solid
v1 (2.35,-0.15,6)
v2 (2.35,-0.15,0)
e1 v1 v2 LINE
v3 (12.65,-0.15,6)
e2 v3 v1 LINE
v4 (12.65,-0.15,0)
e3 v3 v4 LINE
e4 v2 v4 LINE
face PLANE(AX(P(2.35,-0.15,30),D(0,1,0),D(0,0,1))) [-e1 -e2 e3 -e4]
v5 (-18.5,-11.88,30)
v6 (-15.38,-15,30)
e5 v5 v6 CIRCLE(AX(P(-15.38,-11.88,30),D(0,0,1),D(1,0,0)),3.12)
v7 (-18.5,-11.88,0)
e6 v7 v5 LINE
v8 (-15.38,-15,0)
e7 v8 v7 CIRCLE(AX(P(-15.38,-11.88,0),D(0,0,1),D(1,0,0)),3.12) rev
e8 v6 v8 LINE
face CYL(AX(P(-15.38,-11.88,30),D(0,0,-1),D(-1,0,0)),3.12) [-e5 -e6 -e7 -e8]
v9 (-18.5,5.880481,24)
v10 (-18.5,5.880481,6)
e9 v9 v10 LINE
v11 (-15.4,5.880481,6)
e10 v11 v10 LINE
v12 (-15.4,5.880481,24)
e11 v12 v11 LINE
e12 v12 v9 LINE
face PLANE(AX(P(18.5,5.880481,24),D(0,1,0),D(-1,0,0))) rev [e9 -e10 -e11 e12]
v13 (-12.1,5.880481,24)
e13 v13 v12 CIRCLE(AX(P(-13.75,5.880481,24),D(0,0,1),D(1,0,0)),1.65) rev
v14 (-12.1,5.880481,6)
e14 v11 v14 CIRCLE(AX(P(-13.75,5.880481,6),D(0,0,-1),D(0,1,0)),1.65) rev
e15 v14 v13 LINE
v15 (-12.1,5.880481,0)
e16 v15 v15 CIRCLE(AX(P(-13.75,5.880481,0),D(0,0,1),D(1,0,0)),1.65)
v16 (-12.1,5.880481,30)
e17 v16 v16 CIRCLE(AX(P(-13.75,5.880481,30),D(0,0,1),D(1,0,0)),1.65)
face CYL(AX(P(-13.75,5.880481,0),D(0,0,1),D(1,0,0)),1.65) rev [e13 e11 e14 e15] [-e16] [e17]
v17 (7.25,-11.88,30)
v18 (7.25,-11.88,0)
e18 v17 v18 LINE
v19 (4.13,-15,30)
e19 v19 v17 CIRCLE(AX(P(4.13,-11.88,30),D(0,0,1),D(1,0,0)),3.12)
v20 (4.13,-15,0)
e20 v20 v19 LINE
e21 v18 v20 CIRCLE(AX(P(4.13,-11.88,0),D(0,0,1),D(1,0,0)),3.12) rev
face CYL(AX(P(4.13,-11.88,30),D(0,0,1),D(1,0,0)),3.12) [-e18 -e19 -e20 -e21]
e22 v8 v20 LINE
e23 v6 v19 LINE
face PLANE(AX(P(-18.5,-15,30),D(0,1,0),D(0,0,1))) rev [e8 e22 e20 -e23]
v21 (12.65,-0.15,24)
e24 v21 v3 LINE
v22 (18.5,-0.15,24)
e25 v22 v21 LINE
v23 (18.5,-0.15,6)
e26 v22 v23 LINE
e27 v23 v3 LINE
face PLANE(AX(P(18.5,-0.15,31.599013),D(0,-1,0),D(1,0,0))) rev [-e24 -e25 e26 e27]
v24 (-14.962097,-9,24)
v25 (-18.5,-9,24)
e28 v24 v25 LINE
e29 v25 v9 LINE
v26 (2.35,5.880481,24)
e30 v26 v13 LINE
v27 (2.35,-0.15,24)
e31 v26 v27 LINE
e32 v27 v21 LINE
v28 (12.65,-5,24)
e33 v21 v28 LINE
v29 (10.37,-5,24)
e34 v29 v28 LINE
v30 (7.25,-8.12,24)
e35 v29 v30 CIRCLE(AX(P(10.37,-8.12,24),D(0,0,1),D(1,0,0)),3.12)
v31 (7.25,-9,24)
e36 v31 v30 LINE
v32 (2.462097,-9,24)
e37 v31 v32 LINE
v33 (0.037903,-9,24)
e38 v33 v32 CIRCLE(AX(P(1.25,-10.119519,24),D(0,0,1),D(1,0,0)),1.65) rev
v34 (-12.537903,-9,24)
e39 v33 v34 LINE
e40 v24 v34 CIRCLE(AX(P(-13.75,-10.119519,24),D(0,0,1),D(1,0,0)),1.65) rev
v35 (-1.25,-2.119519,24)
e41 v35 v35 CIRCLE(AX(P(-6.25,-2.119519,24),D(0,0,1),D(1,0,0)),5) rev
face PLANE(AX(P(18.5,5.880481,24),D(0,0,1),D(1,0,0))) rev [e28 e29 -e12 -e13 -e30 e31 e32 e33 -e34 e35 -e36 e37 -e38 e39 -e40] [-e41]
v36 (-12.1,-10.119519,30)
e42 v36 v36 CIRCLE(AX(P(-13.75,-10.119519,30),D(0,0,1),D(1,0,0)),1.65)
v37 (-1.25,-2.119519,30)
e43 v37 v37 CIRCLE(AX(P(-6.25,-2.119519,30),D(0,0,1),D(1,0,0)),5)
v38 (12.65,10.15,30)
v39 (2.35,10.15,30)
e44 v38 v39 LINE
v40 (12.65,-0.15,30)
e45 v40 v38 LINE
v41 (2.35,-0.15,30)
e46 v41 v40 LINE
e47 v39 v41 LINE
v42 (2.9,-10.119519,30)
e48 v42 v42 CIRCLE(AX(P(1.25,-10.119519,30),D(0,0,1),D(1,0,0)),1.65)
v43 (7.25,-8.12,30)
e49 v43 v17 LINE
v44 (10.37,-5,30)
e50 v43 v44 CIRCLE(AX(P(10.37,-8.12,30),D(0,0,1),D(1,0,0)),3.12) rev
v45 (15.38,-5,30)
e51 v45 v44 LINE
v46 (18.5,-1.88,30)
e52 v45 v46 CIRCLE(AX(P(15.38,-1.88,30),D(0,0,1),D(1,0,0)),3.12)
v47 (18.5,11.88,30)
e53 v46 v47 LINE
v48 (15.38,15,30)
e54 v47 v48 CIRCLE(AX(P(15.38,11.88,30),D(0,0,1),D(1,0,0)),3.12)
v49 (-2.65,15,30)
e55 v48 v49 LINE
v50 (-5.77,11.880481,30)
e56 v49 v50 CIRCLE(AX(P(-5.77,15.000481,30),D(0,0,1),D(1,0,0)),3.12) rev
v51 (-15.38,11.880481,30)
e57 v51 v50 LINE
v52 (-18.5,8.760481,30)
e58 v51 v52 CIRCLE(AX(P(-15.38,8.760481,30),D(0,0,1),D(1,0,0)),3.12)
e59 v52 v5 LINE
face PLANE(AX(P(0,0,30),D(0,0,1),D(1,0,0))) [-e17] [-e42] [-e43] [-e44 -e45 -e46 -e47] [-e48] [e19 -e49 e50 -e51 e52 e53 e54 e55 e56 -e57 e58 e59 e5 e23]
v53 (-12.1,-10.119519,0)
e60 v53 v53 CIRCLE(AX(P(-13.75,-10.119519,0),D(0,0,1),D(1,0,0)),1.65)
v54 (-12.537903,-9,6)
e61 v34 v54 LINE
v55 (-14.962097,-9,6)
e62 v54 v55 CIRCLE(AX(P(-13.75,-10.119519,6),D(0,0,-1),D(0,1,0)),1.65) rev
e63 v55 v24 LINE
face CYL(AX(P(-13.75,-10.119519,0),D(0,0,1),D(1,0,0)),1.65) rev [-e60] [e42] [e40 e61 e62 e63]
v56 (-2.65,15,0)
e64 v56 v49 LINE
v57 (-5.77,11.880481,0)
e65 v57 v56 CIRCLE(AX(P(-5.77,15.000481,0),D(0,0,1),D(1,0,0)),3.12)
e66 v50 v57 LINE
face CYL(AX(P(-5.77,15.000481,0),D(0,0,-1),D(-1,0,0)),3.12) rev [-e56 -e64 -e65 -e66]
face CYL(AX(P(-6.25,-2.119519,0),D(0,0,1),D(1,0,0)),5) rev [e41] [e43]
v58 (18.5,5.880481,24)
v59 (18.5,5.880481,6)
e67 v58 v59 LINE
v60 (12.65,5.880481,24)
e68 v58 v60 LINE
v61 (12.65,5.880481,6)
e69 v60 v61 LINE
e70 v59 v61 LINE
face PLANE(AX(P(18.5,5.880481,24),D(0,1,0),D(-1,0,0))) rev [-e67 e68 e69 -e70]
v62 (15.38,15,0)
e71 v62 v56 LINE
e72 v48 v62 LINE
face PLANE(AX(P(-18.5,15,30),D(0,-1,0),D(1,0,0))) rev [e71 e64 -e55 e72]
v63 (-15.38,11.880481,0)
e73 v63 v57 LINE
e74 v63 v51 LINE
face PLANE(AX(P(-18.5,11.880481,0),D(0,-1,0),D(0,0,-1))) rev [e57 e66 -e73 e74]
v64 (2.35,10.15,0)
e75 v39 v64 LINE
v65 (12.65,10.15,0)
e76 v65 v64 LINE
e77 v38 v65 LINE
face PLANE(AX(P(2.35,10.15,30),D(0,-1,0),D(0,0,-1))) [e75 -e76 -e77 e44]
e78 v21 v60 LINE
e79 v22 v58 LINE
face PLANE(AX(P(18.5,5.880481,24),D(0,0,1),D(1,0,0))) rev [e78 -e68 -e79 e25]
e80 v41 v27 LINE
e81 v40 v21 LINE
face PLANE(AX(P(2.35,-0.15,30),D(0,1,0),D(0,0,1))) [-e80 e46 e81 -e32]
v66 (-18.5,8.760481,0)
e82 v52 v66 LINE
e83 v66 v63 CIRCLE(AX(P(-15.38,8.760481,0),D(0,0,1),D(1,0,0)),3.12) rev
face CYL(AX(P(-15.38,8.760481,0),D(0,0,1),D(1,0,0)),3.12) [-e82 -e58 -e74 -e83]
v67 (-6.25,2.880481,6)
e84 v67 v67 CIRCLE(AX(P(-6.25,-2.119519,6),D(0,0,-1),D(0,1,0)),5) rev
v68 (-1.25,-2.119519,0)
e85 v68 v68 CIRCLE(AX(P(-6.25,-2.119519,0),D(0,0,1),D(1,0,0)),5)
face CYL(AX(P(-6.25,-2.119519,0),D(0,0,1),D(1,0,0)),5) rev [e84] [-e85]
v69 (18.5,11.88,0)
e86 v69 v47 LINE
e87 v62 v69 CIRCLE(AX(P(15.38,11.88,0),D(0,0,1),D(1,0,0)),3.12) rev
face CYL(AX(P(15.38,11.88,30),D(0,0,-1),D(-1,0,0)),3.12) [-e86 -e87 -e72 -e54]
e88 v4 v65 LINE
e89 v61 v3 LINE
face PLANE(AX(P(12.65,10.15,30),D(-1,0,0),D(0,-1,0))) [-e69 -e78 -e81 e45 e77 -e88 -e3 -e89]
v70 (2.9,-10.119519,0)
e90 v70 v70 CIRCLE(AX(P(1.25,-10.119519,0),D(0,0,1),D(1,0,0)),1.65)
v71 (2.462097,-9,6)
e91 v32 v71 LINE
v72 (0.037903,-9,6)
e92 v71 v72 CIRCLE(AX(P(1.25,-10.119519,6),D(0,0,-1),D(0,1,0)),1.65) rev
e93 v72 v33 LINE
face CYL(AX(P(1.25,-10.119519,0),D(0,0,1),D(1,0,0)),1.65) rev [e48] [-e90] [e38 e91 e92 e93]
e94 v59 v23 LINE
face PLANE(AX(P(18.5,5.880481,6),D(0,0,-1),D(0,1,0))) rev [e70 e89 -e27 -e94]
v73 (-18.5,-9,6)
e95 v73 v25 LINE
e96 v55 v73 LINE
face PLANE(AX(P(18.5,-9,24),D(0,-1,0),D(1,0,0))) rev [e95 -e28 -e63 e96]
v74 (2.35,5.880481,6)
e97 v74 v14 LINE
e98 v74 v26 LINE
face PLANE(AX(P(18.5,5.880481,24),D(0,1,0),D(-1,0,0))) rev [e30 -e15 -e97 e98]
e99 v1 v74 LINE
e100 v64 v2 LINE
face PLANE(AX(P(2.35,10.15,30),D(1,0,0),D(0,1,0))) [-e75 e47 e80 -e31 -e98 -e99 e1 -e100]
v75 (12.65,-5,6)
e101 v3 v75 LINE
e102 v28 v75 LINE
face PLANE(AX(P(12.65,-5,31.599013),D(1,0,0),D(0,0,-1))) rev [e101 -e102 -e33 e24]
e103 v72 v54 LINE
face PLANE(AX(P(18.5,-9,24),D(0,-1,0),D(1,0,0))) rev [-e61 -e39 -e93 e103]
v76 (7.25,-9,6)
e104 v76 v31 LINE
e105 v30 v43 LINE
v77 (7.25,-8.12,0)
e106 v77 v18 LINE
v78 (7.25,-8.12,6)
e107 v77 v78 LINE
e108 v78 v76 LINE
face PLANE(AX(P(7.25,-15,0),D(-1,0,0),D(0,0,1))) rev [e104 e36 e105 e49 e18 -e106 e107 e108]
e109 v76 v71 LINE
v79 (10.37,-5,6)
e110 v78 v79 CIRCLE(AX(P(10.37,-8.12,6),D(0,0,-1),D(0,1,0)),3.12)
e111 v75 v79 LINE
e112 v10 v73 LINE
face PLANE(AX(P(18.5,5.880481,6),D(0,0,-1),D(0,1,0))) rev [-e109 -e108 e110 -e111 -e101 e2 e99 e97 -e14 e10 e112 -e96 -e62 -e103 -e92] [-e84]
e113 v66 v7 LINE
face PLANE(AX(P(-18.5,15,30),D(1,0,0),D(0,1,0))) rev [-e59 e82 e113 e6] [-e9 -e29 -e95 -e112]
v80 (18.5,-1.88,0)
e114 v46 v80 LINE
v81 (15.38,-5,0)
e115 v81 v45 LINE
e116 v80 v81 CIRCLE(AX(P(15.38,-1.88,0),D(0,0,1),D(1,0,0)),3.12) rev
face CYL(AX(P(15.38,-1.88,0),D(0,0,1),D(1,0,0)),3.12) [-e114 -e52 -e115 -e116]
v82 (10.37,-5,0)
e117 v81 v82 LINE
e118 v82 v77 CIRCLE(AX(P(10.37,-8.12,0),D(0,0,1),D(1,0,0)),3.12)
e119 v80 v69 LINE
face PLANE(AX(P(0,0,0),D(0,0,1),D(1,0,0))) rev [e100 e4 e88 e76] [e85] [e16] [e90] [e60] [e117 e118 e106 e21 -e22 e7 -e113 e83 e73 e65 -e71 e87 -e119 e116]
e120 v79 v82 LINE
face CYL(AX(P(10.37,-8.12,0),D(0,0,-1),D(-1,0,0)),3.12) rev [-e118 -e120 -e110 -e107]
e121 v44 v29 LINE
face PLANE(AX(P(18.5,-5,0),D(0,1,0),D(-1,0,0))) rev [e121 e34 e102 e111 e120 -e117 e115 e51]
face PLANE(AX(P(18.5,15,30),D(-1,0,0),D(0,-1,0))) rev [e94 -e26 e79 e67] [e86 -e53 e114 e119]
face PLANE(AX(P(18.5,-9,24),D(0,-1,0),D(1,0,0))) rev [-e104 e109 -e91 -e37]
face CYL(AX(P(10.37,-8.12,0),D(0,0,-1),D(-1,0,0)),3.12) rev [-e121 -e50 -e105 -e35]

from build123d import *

# Parameters (mm, degrees)
SKETCH_1_W          = 37
SKETCH_1_H          = 30
SKETCH_1_W_2        = 10.3
SKETCH_1_H_2        = 10.3
EXTRUDE_1_DEPTH     = 30
SKETCH_2_R          = 1.65
SKETCH_2_W          = 11.25
SKETCH_2_H          = 10
CUT_EXTRUDE_1_DEPTH = 39.304699451
SKETCH_3_R          = 5
SKETCH_3_W          = 15.85
SKETCH_3_H          = 3.119518618
CUT_EXTRUDE_2_DEPTH = 39.304699451
SKETCH_4_W          = 18
SKETCH_4_H          = 14.880481382
CUT_EXTRUDE_3_DEPTH = 50.939963957
SKETCH_5_W          = 5.85
SKETCH_5_H          = 4.85
EXTRUDE_2_DEPTH     = 18
FILLET_2_R          = 3.12


with BuildPart() as part:
    # 草图1 → 凸台-拉伸1 (new body)
    with BuildSketch(Plane.XY):
        Rectangle(SKETCH_1_W, SKETCH_1_H)
        with Locations((7.5, 5)):
            Rectangle(SKETCH_1_W_2, SKETCH_1_H_2, mode=Mode.SUBTRACT)
    extrude(amount=EXTRUDE_1_DEPTH)

    # 草图2 → 切除-拉伸1 (cut, through all)
    with BuildSketch(Plane.XY.offset(30)):
        with Locations((-13.75, 5.880481382)):
            Circle(SKETCH_2_R)
        with Locations((-13.75, -10.119518618)):
            Circle(SKETCH_2_R)
        with Locations((1.25, -10.119518618)):
            Circle(SKETCH_2_R)
        with Locations((12.875, -10)):
            Rectangle(SKETCH_2_W, SKETCH_2_H)
    extrude(amount=-CUT_EXTRUDE_1_DEPTH, mode=Mode.SUBTRACT)

    # 草图3 → 切除-拉伸2 (cut, through all)
    with BuildSketch(Plane.XY.offset(30)):
        with Locations((-6.25, -2.119518618)):
            Circle(SKETCH_3_R)
        with Locations((-10.575, 13.440240691)):
            Rectangle(SKETCH_3_W, SKETCH_3_H)
    extrude(amount=-CUT_EXTRUDE_2_DEPTH, mode=Mode.SUBTRACT)

    # 草图4 → 切除-拉伸3 (cut, through all)
    with BuildSketch(Plane.ZY.offset(18.5)):
        with Locations((15, -1.559759309)):
            Rectangle(SKETCH_4_W, SKETCH_4_H)
    extrude(amount=-CUT_EXTRUDE_3_DEPTH, mode=Mode.SUBTRACT)

    # 草图5 → 凸台-拉伸2 (add)
    with BuildSketch(Plane.XY.offset(6)):
        with Locations((15.575, -2.575)):
            Rectangle(SKETCH_5_W, SKETCH_5_H)
    extrude(amount=EXTRUDE_2_DEPTH)

    # 圆角2
    # the kernel refuses this fillet: 3.12 mm, written as the material it adds along each edge
    with BuildSketch(Plane(origin=(7.25, -5, 6), x_dir=(0, -1, 0), z_dir=(0, 0, -1)), Plane(origin=(7.25, -5, 30), x_dir=(0, -1, 0), z_dir=(0, 0, -1))) as fillet_2_piece_1:
        with BuildLine():
            CenterArc((FILLET_2_R, -FILLET_2_R), FILLET_2_R, 90, 90)
            Line((0, -FILLET_2_R), (-FILLET_2_R * 0.02, -FILLET_2_R))
            Line((-FILLET_2_R * 0.02, -FILLET_2_R), (-FILLET_2_R * 0.02, FILLET_2_R * 0.02))
            Line((-FILLET_2_R * 0.02, FILLET_2_R * 0.02), (FILLET_2_R, FILLET_2_R * 0.02))
            Line((FILLET_2_R, FILLET_2_R * 0.02), (FILLET_2_R, 0))
        make_face()
    extrude(amount=6)
    with BuildSketch(Plane(origin=(-2.65, 11.880481382, 30), x_dir=(0, 1, 0), z_dir=(0, 0, -1))) as fillet_2_piece_2:
        with BuildLine():
            CenterArc((FILLET_2_R, -FILLET_2_R), FILLET_2_R, 90, 90)
            Line((0, -FILLET_2_R), (-FILLET_2_R * 0.02, -FILLET_2_R))
            Line((-FILLET_2_R * 0.02, -FILLET_2_R), (-FILLET_2_R * 0.02, FILLET_2_R * 0.02))
            Line((-FILLET_2_R * 0.02, FILLET_2_R * 0.02), (FILLET_2_R, FILLET_2_R * 0.02))
            Line((FILLET_2_R, FILLET_2_R * 0.02), (FILLET_2_R, 0))
        make_face()
    extrude(amount=30)
    # the kernel refuses this fillet: 3.12 mm, written as the material it takes off along each edge
    with BuildSketch(Plane(origin=(-18.5, 11.880481382, 30), x_dir=(1, 0, 0), z_dir=(0, 0, -1)), Plane(origin=(18.5, -5, 30), x_dir=(-1, 0, 0), z_dir=(0, 0, -1)), Plane(origin=(7.25, -15, 30), x_dir=(-1, 0, 0), z_dir=(0, 0, -1))) as fillet_2_2_piece_1:
        with BuildLine():
            CenterArc((FILLET_2_R, FILLET_2_R), FILLET_2_R, 180, 90)
            Line((0, FILLET_2_R), (-FILLET_2_R * 0.02, FILLET_2_R))
            Line((-FILLET_2_R * 0.02, FILLET_2_R), (-FILLET_2_R * 0.02, -FILLET_2_R * 0.02))
            Line((-FILLET_2_R * 0.02, -FILLET_2_R * 0.02), (FILLET_2_R, -FILLET_2_R * 0.02))
            Line((FILLET_2_R, -FILLET_2_R * 0.02), (FILLET_2_R, 0))
        make_face()
    extrude(amount=30, mode=Mode.SUBTRACT)
    with BuildSketch(Plane(origin=(18.5, 15, 0), x_dir=(0, -1, 0), z_dir=(0, 0, 1)), Plane(origin=(-18.5, -15, 0), x_dir=(0, 1, 0), z_dir=(0, 0, 1))) as fillet_2_2_piece_2:
        with BuildLine():
            CenterArc((FILLET_2_R, -FILLET_2_R), FILLET_2_R, 90, 90)
            Line((0, -FILLET_2_R), (-FILLET_2_R * 0.02, -FILLET_2_R))
            Line((-FILLET_2_R * 0.02, -FILLET_2_R), (-FILLET_2_R * 0.02, FILLET_2_R * 0.02))
            Line((-FILLET_2_R * 0.02, FILLET_2_R * 0.02), (FILLET_2_R, FILLET_2_R * 0.02))
            Line((FILLET_2_R, FILLET_2_R * 0.02), (FILLET_2_R, 0))
        make_face()
    extrude(amount=30, mode=Mode.SUBTRACT)


solid = part.part
